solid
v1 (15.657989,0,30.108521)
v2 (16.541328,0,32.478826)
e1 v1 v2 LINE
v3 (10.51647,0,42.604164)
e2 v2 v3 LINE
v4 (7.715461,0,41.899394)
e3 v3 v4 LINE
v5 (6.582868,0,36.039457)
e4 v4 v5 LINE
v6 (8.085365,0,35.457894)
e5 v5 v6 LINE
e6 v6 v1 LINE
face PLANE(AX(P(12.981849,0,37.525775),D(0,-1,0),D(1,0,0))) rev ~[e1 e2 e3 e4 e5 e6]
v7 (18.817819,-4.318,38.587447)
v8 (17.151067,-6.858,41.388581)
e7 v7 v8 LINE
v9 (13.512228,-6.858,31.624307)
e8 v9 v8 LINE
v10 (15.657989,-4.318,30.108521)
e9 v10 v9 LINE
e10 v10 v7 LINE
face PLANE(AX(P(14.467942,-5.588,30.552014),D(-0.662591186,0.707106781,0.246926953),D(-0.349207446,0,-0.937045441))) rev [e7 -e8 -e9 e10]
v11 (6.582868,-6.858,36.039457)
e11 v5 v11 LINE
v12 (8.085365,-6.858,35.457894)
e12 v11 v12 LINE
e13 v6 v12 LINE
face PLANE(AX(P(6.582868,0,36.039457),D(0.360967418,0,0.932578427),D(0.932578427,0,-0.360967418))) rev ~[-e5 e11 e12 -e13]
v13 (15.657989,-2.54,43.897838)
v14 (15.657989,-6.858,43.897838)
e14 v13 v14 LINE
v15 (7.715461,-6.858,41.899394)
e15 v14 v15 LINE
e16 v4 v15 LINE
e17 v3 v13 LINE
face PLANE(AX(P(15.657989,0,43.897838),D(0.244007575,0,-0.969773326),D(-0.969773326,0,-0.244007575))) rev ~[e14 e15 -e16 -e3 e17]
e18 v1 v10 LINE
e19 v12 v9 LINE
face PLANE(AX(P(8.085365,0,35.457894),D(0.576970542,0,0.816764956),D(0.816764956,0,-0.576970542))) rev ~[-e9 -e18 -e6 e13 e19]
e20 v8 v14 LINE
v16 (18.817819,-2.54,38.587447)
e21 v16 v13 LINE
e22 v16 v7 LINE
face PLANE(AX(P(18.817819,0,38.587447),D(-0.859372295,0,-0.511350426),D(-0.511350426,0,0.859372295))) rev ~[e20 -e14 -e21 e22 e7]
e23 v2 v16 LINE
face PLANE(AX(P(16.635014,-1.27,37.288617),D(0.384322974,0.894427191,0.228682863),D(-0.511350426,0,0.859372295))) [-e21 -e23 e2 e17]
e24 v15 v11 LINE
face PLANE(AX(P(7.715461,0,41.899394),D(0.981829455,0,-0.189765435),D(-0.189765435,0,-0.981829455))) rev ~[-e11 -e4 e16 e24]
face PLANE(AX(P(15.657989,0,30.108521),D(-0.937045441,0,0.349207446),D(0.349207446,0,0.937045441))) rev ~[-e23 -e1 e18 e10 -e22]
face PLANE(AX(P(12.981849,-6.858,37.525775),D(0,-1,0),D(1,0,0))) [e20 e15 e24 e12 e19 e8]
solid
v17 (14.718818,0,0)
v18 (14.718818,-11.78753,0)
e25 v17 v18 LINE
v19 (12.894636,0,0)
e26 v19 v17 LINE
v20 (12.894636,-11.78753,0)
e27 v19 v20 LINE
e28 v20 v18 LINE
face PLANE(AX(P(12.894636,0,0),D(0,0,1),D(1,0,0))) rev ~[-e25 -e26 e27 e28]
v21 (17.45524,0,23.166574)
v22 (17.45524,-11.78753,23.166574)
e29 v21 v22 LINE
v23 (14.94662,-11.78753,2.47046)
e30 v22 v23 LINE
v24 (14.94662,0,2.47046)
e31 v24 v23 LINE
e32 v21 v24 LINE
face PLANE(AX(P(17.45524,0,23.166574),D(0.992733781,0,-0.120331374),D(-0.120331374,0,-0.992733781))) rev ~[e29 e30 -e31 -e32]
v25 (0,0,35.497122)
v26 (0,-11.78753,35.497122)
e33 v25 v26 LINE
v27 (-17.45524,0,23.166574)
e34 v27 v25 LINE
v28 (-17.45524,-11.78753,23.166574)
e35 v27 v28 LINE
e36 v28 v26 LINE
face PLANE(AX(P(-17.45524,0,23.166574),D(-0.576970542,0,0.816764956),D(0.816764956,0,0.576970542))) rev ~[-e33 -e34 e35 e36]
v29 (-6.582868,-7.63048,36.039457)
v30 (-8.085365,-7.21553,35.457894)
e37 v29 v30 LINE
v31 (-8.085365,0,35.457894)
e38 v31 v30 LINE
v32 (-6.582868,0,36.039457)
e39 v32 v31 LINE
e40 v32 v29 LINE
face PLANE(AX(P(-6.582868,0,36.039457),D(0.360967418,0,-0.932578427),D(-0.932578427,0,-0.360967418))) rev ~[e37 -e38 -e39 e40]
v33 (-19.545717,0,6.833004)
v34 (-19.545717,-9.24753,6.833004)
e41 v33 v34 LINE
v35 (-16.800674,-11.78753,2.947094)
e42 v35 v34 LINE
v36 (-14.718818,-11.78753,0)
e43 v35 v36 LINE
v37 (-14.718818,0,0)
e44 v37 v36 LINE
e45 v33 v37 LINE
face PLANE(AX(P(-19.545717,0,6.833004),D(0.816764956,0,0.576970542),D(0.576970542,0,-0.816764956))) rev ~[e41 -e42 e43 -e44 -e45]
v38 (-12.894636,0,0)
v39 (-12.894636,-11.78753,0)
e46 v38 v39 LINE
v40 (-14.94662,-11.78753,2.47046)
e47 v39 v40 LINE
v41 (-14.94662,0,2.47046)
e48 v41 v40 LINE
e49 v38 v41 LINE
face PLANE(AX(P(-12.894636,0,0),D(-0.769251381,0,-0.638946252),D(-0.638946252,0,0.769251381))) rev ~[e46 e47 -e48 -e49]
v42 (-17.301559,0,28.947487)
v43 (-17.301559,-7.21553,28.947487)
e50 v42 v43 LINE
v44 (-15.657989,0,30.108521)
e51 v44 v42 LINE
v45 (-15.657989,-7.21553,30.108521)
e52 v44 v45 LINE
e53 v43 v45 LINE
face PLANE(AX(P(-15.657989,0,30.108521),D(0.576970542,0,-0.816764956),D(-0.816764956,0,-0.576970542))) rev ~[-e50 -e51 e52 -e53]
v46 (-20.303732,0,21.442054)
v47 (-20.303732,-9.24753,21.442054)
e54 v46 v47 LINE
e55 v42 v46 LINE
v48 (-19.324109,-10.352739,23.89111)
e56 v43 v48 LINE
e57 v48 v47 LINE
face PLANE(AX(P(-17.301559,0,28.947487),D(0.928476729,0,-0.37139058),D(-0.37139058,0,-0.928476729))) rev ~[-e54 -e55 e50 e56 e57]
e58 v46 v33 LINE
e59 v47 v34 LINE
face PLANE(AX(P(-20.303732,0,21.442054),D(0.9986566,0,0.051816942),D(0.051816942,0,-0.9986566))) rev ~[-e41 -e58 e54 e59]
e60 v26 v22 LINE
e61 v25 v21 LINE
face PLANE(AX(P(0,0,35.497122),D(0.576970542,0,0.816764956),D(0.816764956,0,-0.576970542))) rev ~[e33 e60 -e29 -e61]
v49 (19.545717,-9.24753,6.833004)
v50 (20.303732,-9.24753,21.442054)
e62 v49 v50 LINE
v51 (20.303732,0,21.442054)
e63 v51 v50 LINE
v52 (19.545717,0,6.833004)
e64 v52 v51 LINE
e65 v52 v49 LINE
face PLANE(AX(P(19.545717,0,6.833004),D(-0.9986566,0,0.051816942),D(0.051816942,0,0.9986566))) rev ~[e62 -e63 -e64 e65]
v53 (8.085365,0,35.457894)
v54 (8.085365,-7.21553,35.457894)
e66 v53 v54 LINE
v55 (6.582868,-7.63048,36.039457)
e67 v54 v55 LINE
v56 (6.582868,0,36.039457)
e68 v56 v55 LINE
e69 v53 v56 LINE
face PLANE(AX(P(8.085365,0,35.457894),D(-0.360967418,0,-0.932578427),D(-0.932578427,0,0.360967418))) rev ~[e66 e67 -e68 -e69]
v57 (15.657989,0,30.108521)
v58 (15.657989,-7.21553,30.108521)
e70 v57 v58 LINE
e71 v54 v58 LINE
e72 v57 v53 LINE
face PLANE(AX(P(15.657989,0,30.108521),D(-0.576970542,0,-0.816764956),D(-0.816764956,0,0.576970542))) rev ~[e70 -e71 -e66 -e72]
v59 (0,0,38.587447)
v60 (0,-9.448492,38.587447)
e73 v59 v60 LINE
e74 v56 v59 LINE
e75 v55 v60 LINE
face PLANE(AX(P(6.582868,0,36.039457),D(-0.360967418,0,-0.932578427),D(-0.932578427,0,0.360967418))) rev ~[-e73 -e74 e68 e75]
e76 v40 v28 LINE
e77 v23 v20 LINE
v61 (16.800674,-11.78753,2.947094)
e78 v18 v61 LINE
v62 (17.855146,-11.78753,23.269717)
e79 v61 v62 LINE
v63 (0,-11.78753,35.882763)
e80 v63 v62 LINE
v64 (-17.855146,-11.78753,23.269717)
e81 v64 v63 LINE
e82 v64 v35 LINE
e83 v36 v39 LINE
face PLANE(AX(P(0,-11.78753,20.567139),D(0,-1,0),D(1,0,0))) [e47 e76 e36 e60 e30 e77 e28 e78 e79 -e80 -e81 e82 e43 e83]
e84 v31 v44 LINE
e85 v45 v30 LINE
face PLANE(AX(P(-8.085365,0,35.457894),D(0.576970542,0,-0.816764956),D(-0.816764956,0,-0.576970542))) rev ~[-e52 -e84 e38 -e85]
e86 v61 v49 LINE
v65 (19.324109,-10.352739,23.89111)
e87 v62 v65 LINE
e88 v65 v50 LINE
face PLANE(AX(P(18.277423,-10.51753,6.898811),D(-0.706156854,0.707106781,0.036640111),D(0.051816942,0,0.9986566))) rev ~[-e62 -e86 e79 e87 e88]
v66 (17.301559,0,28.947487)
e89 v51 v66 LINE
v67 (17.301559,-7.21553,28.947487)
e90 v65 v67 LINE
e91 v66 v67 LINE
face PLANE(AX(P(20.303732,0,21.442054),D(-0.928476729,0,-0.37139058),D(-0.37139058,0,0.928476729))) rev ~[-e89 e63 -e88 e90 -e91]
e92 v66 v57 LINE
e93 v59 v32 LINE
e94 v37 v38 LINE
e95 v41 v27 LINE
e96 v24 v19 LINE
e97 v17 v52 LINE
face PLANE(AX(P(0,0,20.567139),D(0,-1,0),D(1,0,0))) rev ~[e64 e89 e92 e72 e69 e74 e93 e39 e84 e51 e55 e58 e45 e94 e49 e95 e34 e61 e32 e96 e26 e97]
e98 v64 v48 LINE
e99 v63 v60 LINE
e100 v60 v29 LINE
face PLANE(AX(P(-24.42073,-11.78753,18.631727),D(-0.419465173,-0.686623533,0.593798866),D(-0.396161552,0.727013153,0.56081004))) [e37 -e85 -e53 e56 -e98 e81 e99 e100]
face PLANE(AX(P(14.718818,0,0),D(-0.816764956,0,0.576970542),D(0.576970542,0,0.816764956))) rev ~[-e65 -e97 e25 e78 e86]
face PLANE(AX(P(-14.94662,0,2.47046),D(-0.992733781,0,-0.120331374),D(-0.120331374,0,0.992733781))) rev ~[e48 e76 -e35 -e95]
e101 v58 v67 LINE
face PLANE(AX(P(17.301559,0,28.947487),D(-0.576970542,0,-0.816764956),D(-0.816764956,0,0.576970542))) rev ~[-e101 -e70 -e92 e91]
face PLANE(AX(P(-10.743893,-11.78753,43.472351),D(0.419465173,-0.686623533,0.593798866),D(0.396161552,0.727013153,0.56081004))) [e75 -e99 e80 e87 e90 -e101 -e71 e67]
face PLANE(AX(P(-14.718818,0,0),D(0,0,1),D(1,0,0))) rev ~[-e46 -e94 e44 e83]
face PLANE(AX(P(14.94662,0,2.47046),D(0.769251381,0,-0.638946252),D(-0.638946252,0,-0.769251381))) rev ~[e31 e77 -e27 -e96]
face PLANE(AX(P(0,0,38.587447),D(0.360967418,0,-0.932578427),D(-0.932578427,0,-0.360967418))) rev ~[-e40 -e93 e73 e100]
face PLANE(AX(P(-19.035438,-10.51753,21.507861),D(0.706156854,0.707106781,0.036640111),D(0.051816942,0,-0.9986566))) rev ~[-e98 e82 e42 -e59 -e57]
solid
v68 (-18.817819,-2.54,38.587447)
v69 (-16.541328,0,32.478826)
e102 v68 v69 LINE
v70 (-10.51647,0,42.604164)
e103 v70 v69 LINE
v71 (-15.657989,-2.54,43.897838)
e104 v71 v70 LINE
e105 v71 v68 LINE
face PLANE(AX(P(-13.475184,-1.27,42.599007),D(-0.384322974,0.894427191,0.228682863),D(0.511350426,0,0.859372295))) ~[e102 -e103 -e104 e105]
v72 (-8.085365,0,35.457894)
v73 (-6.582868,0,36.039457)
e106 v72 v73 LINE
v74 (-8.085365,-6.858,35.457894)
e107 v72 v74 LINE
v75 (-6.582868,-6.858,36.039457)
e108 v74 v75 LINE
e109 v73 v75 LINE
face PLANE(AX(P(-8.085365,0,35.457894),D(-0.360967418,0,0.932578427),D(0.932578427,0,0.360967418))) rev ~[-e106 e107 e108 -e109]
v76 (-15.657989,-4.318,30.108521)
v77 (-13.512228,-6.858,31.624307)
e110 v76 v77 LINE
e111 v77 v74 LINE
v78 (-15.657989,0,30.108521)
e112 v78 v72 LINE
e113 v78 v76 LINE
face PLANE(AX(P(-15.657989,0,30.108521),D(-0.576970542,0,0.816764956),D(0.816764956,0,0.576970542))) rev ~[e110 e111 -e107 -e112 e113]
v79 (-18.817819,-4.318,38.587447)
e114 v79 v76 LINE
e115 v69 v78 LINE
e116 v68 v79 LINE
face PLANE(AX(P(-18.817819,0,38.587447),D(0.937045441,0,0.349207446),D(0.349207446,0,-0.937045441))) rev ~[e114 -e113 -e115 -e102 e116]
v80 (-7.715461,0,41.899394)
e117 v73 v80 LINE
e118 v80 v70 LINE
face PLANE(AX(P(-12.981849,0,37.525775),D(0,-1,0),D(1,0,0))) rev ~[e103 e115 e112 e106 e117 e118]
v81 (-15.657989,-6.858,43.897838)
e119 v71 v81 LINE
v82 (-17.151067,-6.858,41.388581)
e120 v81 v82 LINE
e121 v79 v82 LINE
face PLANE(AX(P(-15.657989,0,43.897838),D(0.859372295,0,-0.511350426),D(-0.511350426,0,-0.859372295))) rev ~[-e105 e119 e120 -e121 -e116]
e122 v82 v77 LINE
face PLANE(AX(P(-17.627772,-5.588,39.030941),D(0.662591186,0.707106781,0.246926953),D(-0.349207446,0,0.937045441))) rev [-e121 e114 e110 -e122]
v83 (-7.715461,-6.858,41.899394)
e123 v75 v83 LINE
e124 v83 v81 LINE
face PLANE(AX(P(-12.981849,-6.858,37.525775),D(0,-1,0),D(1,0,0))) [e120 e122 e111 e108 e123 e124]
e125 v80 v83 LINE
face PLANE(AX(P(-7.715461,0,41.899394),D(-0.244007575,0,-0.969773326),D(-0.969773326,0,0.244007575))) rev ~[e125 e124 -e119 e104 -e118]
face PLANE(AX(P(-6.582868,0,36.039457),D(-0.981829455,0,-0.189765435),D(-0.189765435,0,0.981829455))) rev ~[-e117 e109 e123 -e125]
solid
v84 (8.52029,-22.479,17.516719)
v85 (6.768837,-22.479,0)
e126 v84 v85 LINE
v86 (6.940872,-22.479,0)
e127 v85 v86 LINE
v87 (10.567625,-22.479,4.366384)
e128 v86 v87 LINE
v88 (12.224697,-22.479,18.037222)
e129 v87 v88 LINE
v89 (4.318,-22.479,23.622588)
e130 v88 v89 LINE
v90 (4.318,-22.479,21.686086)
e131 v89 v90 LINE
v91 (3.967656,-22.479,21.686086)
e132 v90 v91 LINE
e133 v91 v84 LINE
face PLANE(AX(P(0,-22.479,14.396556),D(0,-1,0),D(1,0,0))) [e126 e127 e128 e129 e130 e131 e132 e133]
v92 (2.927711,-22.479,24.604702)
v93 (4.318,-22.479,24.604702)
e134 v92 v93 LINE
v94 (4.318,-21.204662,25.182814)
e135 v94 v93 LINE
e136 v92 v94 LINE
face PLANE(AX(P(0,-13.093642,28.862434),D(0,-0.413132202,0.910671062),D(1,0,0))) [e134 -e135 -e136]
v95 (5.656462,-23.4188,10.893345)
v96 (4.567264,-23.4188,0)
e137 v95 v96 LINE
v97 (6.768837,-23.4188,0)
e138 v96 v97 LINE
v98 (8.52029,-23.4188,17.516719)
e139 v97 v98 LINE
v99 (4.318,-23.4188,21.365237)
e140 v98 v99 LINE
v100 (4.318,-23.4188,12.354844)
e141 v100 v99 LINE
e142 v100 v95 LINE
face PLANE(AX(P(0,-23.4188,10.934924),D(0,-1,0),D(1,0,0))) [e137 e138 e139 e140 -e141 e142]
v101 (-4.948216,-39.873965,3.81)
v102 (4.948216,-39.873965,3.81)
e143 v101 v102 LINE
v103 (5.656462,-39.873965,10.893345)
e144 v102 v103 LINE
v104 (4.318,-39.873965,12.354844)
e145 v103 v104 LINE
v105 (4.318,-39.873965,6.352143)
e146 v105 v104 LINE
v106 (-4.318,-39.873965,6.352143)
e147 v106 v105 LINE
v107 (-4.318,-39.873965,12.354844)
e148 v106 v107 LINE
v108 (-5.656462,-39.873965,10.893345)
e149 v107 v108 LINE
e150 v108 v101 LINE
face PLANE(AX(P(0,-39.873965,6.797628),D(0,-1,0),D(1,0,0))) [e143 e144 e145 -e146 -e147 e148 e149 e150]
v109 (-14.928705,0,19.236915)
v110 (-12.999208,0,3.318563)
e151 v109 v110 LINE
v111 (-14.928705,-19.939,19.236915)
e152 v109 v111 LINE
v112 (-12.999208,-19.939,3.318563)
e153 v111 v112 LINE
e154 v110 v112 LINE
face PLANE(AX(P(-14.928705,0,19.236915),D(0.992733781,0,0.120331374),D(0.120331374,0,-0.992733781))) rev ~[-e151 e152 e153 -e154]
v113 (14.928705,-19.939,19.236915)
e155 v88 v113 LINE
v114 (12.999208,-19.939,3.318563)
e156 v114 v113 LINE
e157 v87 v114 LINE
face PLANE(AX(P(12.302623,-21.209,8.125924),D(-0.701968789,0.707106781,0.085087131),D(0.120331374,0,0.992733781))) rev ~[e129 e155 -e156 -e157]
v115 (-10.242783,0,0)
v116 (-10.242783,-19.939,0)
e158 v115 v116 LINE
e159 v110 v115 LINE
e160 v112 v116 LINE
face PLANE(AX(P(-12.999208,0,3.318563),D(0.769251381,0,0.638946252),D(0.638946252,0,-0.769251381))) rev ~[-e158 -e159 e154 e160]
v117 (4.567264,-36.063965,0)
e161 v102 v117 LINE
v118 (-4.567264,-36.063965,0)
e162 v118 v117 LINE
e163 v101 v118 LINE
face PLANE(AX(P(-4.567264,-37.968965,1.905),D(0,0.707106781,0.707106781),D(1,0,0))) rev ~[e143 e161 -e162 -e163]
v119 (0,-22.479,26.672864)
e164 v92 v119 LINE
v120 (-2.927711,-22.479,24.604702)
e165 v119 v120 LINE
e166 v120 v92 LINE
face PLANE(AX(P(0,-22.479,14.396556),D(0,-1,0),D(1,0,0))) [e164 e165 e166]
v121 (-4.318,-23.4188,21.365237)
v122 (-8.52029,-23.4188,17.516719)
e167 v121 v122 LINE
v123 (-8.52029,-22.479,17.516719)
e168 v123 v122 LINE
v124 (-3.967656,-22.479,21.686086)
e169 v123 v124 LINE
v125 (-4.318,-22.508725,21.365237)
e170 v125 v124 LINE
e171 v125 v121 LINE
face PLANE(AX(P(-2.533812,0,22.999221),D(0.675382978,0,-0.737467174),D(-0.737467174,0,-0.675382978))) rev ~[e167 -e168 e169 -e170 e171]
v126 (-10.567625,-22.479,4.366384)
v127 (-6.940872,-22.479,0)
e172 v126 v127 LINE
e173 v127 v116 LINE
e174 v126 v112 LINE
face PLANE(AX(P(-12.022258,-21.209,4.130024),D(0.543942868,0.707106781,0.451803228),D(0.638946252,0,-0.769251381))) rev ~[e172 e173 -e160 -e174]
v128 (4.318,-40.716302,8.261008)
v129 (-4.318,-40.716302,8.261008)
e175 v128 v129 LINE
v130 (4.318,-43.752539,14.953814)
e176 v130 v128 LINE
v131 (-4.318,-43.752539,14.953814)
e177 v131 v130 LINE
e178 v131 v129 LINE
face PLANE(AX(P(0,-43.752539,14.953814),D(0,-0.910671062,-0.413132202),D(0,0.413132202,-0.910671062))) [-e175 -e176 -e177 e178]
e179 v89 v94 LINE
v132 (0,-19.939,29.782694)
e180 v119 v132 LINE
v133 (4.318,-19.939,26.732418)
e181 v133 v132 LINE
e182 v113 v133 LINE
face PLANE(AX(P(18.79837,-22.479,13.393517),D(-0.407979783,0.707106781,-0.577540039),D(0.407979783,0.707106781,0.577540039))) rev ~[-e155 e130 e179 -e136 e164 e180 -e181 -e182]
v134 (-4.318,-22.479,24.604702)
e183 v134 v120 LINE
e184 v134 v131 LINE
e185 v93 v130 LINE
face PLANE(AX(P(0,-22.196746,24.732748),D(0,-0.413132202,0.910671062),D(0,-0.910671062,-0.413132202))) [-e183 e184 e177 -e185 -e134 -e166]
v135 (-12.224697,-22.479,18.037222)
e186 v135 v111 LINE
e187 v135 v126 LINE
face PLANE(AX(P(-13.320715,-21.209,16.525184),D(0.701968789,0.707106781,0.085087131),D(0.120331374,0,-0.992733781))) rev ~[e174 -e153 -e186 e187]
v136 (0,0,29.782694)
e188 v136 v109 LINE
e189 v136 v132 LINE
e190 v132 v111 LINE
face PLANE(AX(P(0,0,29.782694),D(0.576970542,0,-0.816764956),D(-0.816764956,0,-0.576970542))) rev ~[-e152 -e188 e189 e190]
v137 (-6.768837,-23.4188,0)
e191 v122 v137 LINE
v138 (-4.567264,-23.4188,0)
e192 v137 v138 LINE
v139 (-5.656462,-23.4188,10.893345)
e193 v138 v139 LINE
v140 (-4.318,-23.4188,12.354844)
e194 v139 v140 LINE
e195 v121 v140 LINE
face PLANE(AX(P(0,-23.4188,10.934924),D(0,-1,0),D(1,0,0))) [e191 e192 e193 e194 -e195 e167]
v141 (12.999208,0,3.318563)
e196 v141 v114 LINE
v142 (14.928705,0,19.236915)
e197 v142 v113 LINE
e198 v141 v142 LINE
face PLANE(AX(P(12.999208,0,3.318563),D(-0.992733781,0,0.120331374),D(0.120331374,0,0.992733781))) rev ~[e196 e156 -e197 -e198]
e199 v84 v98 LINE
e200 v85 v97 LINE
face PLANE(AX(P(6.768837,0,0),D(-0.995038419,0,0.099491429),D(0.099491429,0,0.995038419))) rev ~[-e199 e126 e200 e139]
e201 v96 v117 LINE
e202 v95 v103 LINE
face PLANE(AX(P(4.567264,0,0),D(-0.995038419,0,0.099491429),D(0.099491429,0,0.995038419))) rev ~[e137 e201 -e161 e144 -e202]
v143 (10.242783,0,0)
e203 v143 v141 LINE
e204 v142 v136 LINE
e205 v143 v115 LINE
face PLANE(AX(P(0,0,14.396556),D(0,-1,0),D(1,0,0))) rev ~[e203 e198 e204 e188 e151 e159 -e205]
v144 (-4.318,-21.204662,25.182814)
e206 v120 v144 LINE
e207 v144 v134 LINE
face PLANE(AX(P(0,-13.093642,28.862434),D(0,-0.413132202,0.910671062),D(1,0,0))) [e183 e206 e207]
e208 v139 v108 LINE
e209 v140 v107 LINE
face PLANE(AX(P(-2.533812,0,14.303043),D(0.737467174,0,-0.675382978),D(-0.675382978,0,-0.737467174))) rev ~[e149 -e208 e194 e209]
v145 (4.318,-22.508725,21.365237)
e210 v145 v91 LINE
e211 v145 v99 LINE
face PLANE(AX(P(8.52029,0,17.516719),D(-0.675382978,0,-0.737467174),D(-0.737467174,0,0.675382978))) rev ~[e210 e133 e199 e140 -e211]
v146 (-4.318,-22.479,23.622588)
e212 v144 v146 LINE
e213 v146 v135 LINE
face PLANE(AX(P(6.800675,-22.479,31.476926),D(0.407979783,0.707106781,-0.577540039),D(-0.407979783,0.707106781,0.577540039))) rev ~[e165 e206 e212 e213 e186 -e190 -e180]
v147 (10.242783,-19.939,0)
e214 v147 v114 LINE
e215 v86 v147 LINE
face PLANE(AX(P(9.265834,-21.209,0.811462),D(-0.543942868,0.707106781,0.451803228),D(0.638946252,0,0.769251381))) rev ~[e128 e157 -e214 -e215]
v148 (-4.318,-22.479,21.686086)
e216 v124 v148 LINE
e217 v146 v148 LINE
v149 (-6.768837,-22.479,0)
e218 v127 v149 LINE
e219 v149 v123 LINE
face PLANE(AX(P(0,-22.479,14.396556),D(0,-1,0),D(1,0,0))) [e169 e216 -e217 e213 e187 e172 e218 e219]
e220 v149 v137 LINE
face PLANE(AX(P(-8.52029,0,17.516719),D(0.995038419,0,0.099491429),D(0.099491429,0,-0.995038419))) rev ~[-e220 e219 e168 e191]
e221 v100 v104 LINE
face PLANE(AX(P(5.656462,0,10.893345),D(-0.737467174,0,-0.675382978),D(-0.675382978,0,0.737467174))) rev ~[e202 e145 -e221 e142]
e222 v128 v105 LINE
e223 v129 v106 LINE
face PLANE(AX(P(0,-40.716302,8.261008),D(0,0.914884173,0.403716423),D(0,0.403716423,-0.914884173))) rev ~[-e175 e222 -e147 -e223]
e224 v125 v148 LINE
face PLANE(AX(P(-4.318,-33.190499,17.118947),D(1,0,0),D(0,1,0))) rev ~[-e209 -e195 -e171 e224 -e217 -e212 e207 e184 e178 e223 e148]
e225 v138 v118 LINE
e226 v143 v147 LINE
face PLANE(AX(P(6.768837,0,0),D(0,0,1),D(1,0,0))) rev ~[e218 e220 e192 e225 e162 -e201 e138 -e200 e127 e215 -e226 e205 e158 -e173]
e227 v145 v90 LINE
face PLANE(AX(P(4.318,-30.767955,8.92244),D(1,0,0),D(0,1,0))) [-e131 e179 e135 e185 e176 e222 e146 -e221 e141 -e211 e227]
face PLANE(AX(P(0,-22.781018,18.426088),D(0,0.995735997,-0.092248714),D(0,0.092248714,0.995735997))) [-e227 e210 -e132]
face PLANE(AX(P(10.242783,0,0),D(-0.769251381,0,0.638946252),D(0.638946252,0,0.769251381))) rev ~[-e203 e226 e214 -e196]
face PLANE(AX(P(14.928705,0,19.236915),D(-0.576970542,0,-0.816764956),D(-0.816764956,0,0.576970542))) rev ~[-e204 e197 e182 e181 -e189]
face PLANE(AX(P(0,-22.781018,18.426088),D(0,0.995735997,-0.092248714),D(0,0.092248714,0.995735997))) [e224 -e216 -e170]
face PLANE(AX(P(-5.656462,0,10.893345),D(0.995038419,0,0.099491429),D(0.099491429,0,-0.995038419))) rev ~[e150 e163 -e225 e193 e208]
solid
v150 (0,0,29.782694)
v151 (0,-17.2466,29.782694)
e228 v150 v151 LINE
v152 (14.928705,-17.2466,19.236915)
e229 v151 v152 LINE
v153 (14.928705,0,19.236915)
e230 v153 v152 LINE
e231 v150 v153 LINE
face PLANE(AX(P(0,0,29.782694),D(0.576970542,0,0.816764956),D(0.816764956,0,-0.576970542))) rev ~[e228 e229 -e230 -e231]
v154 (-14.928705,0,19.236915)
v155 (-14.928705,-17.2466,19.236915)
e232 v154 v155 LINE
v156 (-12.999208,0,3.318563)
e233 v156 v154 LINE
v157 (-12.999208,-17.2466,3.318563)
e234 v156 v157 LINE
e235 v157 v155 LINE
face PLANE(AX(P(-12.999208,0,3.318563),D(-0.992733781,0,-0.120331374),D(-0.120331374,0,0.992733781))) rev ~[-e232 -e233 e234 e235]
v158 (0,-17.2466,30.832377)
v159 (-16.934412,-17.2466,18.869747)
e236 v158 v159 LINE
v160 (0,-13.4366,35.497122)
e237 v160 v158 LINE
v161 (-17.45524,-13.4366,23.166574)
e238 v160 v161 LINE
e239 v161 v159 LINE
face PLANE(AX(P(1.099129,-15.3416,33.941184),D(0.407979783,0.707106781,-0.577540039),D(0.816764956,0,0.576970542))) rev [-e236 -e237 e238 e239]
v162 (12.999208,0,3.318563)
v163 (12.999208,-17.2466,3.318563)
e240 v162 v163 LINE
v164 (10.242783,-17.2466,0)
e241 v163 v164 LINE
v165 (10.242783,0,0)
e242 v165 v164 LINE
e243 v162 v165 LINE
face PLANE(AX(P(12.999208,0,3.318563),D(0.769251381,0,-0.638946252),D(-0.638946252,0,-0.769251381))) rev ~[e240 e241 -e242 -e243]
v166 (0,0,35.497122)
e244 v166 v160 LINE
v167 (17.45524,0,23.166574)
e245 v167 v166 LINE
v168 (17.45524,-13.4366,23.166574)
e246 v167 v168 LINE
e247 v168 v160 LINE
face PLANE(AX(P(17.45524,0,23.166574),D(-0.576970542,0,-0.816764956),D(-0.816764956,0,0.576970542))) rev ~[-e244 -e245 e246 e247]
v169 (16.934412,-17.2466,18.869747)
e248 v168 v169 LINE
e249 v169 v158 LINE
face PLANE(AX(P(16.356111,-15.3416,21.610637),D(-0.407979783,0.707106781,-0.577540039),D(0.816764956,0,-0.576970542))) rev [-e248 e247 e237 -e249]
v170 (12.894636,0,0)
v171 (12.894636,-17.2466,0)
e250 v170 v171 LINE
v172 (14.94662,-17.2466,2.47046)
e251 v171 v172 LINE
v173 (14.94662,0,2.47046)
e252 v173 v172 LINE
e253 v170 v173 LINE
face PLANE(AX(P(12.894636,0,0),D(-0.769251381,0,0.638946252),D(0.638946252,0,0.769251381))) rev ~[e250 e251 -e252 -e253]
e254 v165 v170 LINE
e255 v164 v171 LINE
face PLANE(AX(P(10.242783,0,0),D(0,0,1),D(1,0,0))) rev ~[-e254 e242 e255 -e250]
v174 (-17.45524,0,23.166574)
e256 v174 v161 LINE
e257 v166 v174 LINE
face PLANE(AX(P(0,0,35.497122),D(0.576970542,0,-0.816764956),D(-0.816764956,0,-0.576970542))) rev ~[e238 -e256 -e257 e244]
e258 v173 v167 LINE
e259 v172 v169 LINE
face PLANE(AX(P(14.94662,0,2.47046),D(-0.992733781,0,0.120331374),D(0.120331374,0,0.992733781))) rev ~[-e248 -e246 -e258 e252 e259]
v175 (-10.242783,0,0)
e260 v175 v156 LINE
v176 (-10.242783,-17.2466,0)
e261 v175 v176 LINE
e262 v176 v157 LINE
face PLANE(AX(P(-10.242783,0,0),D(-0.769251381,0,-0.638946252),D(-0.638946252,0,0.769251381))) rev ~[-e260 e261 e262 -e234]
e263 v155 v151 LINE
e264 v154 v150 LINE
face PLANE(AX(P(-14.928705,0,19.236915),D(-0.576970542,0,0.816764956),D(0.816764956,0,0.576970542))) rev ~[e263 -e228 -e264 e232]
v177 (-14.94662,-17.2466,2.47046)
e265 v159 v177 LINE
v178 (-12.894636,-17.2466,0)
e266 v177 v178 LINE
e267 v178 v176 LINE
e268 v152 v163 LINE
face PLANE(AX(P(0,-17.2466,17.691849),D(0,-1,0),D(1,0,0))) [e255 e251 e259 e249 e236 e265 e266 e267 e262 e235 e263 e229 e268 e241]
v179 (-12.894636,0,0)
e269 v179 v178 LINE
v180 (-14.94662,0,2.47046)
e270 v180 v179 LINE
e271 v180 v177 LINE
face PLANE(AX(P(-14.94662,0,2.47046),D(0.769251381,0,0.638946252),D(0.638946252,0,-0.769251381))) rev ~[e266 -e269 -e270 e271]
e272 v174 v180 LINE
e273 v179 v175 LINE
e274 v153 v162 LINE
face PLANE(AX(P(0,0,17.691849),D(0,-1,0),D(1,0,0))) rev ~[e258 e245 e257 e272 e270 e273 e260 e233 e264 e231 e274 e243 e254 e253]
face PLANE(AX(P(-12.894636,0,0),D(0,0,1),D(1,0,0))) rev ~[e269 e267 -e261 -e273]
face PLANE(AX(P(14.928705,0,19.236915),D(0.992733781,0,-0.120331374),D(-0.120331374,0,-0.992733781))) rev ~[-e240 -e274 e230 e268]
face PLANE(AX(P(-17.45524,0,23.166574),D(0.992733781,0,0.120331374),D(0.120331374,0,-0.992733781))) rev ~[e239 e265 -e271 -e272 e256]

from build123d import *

# Parameters (mm, degrees)
F2_DEPTH      = 39.8739650846
F3_DEPTH      = 23.4188
F4_DEPTH      = 2.5338120759
F5_DEPTH      = 2.5338120759
F6_DEPTH      = 4.318
F7_DEPTH      = 4.318
F8_DEPTH      = 4.318
F9_DEPTH      = 4.318
F10_DEPTH     = 22.479
F11_DEPTH     = 6.858
F12_DEPTH     = 6.858
F13_SIZE      = 3.81
F14_DEPTH     = 11.7875300348
F15_T4_DEPTH  = 31.3419967727
F15_T10_DEPTH = 31.3419967727
F15_T16_DEPTH = 31.3419967727
F15_T22_DEPTH = 31.3419967727
F15_T28_DEPTH = 31.3419967727
F15_T34_DEPTH = 31.3419967727
F16_SIZE      = 2.54
F17_T1_DEPTH  = 43.0535401591
F17_T3_DEPTH  = 43.0535401591
F18_SIZE2     = 5.08
F18_SIZE      = 2.54
F19_SIZE2     = 2.54
F19_SIZE      = 5.08
F20_SIZE      = 2.54
F20_2_SIZE    = 2.54
F21_SIZE      = 2.54
F22_SIZE      = 2.54
F23_DEPTH     = 17.2466
F24_SIZE      = 3.81


# Not quite as in the source:
# - a fillet or chamfer that OpenCascade refuses, or shapes differently, is made with other operations: its cross-section is extruded or revolved along the edge and cut away or added


with BuildPart() as f2:
    # F0 (on Front) → F2 (new body, through all)
    with BuildSketch(Plane.XZ):
        Polygon((-5.6564622056, 10.8933445899), (-4.5672636413, 0), (4.5672636413, 0), (5.6564622056, 10.8933445899), (2.5338120759, 14.3030425534), (0, 14.3030425534), (-2.5338120759, 14.3030425534), align=None)
    extrude(amount=F2_DEPTH)

    # F0 (on Front) → F3 (join)
    with BuildSketch(Plane.XZ):
        Polygon((2.5338120759, 22.999221459), (0, 22.999221459), (-2.5338120759, 22.999221459), (-8.5202902555, 17.5167191774), (-6.7688368594, 0), (-4.5672636413, 0), (-5.6564622056, 10.8933445899), (-2.5338120759, 14.3030425534), (0, 14.3030425534), (2.5338120759, 14.3030425534), (5.6564622056, 10.8933445899), (4.5672636413, 0), (6.7688368594, 0), (8.5202902555, 17.5167191774), align=None)
    extrude(amount=F3_DEPTH)

    # F1 (on Right) → F4 (join, through all)
    with BuildSketch(Plane.YZ):
        Polygon((-24.4880802929, 0), (-22.7810184772, 18.4260877826), (-39.8739650846, 13.7478467077), (-40.7163016498, 8.2610081881), (-37.5194847584, 1.0165241547), align=None)
    extrude(amount=F4_DEPTH)

    # F1 (on Right) → F5 (join, through all)
    with BuildSketch(Plane.YZ):
        Polygon((-24.4880802929, 0), (-22.7810184772, 18.4260877826), (-39.8739650846, 13.7478467077), (-40.7163016498, 8.2610081881), (-37.5194847584, 1.0165241547), align=None)
    extrude(amount=-F5_DEPTH)

    # F1 (on Right) → F6 (join)
    with BuildSketch(Plane.YZ):
        Polygon((-22.7810184772, 18.4260877826), (-22.196745819, 24.7327482608), (-43.7525391617, 14.9538140945), (-40.7163016498, 8.2610081881), (-39.8739650846, 13.7478467077), align=None)
    extrude(amount=F6_DEPTH)

    # F1 (on Right) → F7 (join)
    with BuildSketch(Plane.YZ):
        Polygon((-22.7810184772, 18.4260877826), (-22.196745819, 24.7327482608), (-43.7525391617, 14.9538140945), (-40.7163016498, 8.2610081881), (-39.8739650846, 13.7478467077), align=None)
    extrude(amount=-F7_DEPTH)

    # F1 (on Right) → F8 (join)
    with BuildSketch(Plane.YZ):
        Polygon((-24.4880802929, 0), (-22.7810184772, 18.4260877826), (-39.8739650846, 13.7478467077), (-40.7163016498, 8.2610081881), (-37.5194847584, 1.0165241547), align=None)
    extrude(amount=F8_DEPTH)

    # F1 (on Right) → F9 (join)
    with BuildSketch(Plane.YZ):
        Polygon((-24.4880802929, 0), (-22.7810184772, 18.4260877826), (-39.8739650846, 13.7478467077), (-40.7163016498, 8.2610081881), (-37.5194847584, 1.0165241547), align=None)
    extrude(amount=-F9_DEPTH)

    # F0 (on Front) → F10 (join)
    with BuildSketch(Plane.XZ):
        Polygon((-2.5338120759, 22.999221459), (0, 22.999221459), (2.5338120759, 22.999221459), (8.5202902555, 17.5167191774), (6.7688368594, 0), (10.2427834645, 0), (12.9992077127, 3.318562638), (14.928705059, 19.2369148135), (0, 29.7826942206), (-14.928705059, 19.2369148135), (-12.9992077127, 3.318562638), (-10.2427834645, 0), (-6.7688368594, 0), (-8.5202902555, 17.5167191774), align=None)
    extrude(amount=F10_DEPTH)

    # F13
    f13_edges = [f2.edges().sort_by_distance(p)[0] for p in [
        (0, -39.873965, 0),
    ]]
    chamfer(f13_edges, length=F13_SIZE)

    # F15: chamfer of 2.54 on 2 edges, made by hand


with BuildPart() as f11:
    # F0 (on Front) → F11 (new body)
    with BuildSketch(Plane.XZ):
        Polygon((-18.8178192778, 38.5874472558), (-15.6579893082, 30.1085207639), (-8.0853653706, 35.4578944211), (-6.5828679126, 36.0394569064), (-7.71546131, 41.899394244), (-15.6579893082, 43.8978375339), align=None)
    extrude(amount=F11_DEPTH)

    # F18
    f18_edges = [f11.edges().sort_by_distance(p)[0] for p in [
        (-17.237904, 0, 41.242642),
    ]]
    f18_side = f11.faces().sort_by_distance((-17.237904, -3.429, 41.242642))[0]
    chamfer(f18_edges, length=F18_SIZE, length2=F18_SIZE2, reference=f18_side)

    # F20
    f20_edges = [f11.edges().sort_by_distance(p)[0] for p in [
        (-17.237904, -6.858, 34.347984),
    ]]
    chamfer(f20_edges, length=F20_SIZE)


with BuildPart() as f12:
    # F0 (on Front) → F12 (new body)
    with BuildSketch(Plane.XZ):
        Polygon((8.0853653706, 35.4578944211), (15.6579893082, 30.1085207639), (18.8178192778, 38.5874472558), (15.6579893082, 43.8978375339), (7.71546131, 41.899394244), (6.5828679126, 36.0394569064), align=None)
    extrude(amount=F12_DEPTH)

    # F19
    f19_edges = [f12.edges().sort_by_distance(p)[0] for p in [
        (17.237904, 0, 41.242642),
    ]]
    f19_side = f12.faces().sort_by_distance((12.965594, 0, 37.738789))[0]
    chamfer(f19_edges, length=F19_SIZE, length2=F19_SIZE2, reference=f19_side)

    # F20#2
    f20_2_edges = [f12.edges().sort_by_distance(p)[0] for p in [
        (17.237904, -6.858, 34.347984),
    ]]
    chamfer(f20_2_edges, length=F20_2_SIZE)


with BuildPart() as f14:
    # F0 (on Front) → F14 (new body, through all)
    with BuildSketch(Plane.XZ):
        Polygon((-14.7188181917, 0), (-12.8946364057, 0), (-14.9466200506, 2.4704601485), (-17.4552400274, 23.1665737461), (0, 35.4971215129), (17.4552400274, 23.1665737461), (14.9466200506, 2.4704601485), (12.8946364057, 0), (14.7188181917, 0), (19.5457171649, 6.8330038339), (20.3037317842, 21.4420538396), (17.3015593183, 28.9474872584), (15.6579893082, 30.1085207639), (8.0853653706, 35.4578944211), (6.5828679126, 36.0394569064), (0, 38.5874472558), (-6.5828679126, 36.0394569064), (-8.0853653706, 35.4578944211), (-15.6579893082, 30.1085207639), (-17.3015593183, 28.9474872584), (-20.3037317842, 21.4420538396), (-19.5457171649, 6.8330038339), align=None)
    extrude(amount=F14_DEPTH)

    # F17: chamfer of 4.318 x 4.572 on 2 edges, made by hand

    # F17_s2 → F17_t1 (cut)
    with BuildSketch(Plane(origin=(-7.5110021569, 0, -5.3058434446), x_dir=(0, 1, 0), z_dir=(0.816764956, 0, 0.5769705423))):
        Polygon((-11.7875300348, 29.307783219), (-7.2155300348, 33.625783219), (-11.7875300348, 33.625783219), align=None)
    extrude(amount=F17_T1_DEPTH, mode=Mode.SUBTRACT)

    # F17_s4 → F17_t3 (cut)
    with BuildSketch(Plane(origin=(-27.6536206766, 0, 19.534780968), x_dir=(0, 1, 0), z_dir=(0.816764956, 0, -0.5769705423))):
        Polygon((-11.7875300348, 29.307783219), (-7.2155300348, 33.625783219), (-11.7875300348, 33.625783219), align=None)
    extrude(amount=F17_T3_DEPTH, mode=Mode.SUBTRACT)

    # F21
    f21_edges = [f14.edges().sort_by_distance(p)[0] for p in [
        (-19.924724, -11.78753, 14.137529),
        (19.924724, -11.78753, 14.137529),
    ]]
    chamfer(f21_edges, length=F21_SIZE)


with BuildPart() as f15_tool2:
    # F15_s3 → F15_t4 (new body)
    with BuildSketch(Plane(origin=(19.3702441645, 0, 13.6833249243), x_dir=(0, 1, 0), z_dir=(-0.816764956, 0, -0.5769705423))):
        Polygon((-22.479, -21.7854609346), (-19.939, -24.3254609346), (-22.479, -24.3254609346), align=None)
    extrude(amount=F15_T4_DEPTH)

    split(bisect_by=Plane(origin=(0, -13.0936420454, 28.8624340069), x_dir=(1, 0, 0), z_dir=(0, -0.4131322018, 0.9106710624)), keep=Keep.TOP)

    split(bisect_by=Plane.YZ.offset(-4.318), keep=Keep.TOP)


with BuildPart() as f2_1:
    add(f2.part)

    # F15_t1: cut F15_tool2
    add(f15_tool2.part, mode=Mode.SUBTRACT)


with BuildPart() as f15_tool8:
    # F15_s9 → F15_t10 (new body)
    with BuildSketch(Plane(origin=(19.3702441645, 0, 13.6833249243), x_dir=(0, 1, 0), z_dir=(-0.816764956, 0, -0.5769705423))):
        Polygon((-22.479, -21.7854609346), (-19.939, -24.3254609346), (-22.479, -24.3254609346), align=None)
    extrude(amount=F15_T10_DEPTH)

    split(bisect_by=Plane(origin=(0, -13.0936420454, 28.8624340069), x_dir=(1, 0, 0), z_dir=(0, -0.4131322018, 0.9106710624)), keep=Keep.TOP)

    split(bisect_by=Plane.YZ.offset(-4.318), keep=Keep.BOTTOM)


with BuildPart() as f2_2:
    add(f2_1.part)

    # F15_t7: cut F15_tool8
    add(f15_tool8.part, mode=Mode.SUBTRACT)


with BuildPart() as f15_tool14:
    # F15_s15 → F15_t16 (new body)
    with BuildSketch(Plane(origin=(19.3702441645, 0, 13.6833249243), x_dir=(0, 1, 0), z_dir=(-0.816764956, 0, -0.5769705423))):
        Polygon((-22.479, -21.7854609346), (-19.939, -24.3254609346), (-22.479, -24.3254609346), align=None)
    extrude(amount=F15_T16_DEPTH)

    split(bisect_by=Plane(origin=(0, -13.0936420454, 28.8624340069), x_dir=(1, 0, 0), z_dir=(0, 0.4131322018, -0.9106710624)), keep=Keep.TOP)

    split(bisect_by=Plane.YZ.offset(-4.318), keep=Keep.BOTTOM)


with BuildPart() as f2_3:
    add(f2_2.part)

    # F15_t13: cut F15_tool14
    add(f15_tool14.part, mode=Mode.SUBTRACT)


with BuildPart() as f15_tool20:
    # F15_s21 → F15_t22 (new body)
    with BuildSketch(Plane(origin=(6.2288004504, 0, -4.4000839497), x_dir=(0, 1, 0), z_dir=(-0.816764956, 0, 0.5769705423))):
        Polygon((-22.479, -21.7854609346), (-19.939, -24.3254609346), (-22.479, -24.3254609346), align=None)
    extrude(amount=F15_T22_DEPTH)

    split(bisect_by=Plane.YZ.offset(4.318), keep=Keep.TOP)

    split(bisect_by=Plane(origin=(0, -13.0936420454, 28.8624340069), x_dir=(1, 0, 0), z_dir=(0, 0.4131322018, -0.9106710624)), keep=Keep.TOP)


with BuildPart() as f2_4:
    add(f2_3.part)

    # F15_t19: cut F15_tool20
    add(f15_tool20.part, mode=Mode.SUBTRACT)


with BuildPart() as f15_tool26:
    # F15_s27 → F15_t28 (new body)
    with BuildSketch(Plane(origin=(6.2288004504, 0, -4.4000839497), x_dir=(0, 1, 0), z_dir=(-0.816764956, 0, 0.5769705423))):
        Polygon((-22.479, -21.7854609346), (-19.939, -24.3254609346), (-22.479, -24.3254609346), align=None)
    extrude(amount=F15_T28_DEPTH)

    split(bisect_by=Plane.YZ.offset(4.318), keep=Keep.TOP)

    split(bisect_by=Plane(origin=(0, -13.0936420454, 28.8624340069), x_dir=(1, 0, 0), z_dir=(0, -0.4131322018, 0.9106710624)), keep=Keep.TOP)


with BuildPart() as f2_5:
    add(f2_4.part)

    # F15_t25: cut F15_tool26
    add(f15_tool26.part, mode=Mode.SUBTRACT)


with BuildPart() as f15_tool32:
    # F15_s33 → F15_t34 (new body)
    with BuildSketch(Plane(origin=(6.2288004504, 0, -4.4000839497), x_dir=(0, 1, 0), z_dir=(-0.816764956, 0, 0.5769705423))):
        Polygon((-22.479, -21.7854609346), (-19.939, -24.3254609346), (-22.479, -24.3254609346), align=None)
    extrude(amount=F15_T34_DEPTH)

    split(bisect_by=Plane.YZ.offset(4.318), keep=Keep.BOTTOM)

    split(bisect_by=Plane(origin=(0, -13.0936420454, 28.8624340069), x_dir=(1, 0, 0), z_dir=(0, -0.4131322018, 0.9106710624)), keep=Keep.TOP)


with BuildPart() as f2_6:
    add(f2_5.part)

    # F15_t31: cut F15_tool32
    add(f15_tool32.part, mode=Mode.SUBTRACT)

    # F16
    f16_edges = [f2_6.edges().sort_by_distance(p)[0] for p in [
        (-11.620996, -22.479, 1.659281),
        (11.620996, -22.479, 1.659281),
    ]]
    chamfer(f16_edges, length=F16_SIZE)

    # F22
    f22_edges = [f2_6.edges().sort_by_distance(p)[0] for p in [
        (-14.072441, -22.479, 12.172733),
        (14.072441, -22.479, 12.172733),
    ]]
    chamfer(f22_edges, length=F22_SIZE)


with BuildPart() as f23:
    # F0 (on Front) → F23 (new body)
    with BuildSketch(Plane.XZ):
        Polygon((-12.8946364057, 0), (-10.2427834645, 0), (-12.9992077127, 3.318562638), (-14.928705059, 19.2369148135), (0, 29.7826942206), (14.928705059, 19.2369148135), (12.9992077127, 3.318562638), (10.2427834645, 0), (12.8946364057, 0), (14.9466200506, 2.4704601485), (17.4552400274, 23.1665737461), (0, 35.4971215129), (-17.4552400274, 23.1665737461), (-14.9466200506, 2.4704601485), align=None)
    extrude(amount=F23_DEPTH)

    # F24
    f24_edges = [f23.edges().sort_by_distance(p)[0] for p in [
        (-8.72762, -17.2466, 29.331848),
        (8.72762, -17.2466, 29.331848),
    ]]
    chamfer(f24_edges, length=F24_SIZE)


solid = Compound([f11.part, f12.part, f14.part, f2_6.part, f23.part])
